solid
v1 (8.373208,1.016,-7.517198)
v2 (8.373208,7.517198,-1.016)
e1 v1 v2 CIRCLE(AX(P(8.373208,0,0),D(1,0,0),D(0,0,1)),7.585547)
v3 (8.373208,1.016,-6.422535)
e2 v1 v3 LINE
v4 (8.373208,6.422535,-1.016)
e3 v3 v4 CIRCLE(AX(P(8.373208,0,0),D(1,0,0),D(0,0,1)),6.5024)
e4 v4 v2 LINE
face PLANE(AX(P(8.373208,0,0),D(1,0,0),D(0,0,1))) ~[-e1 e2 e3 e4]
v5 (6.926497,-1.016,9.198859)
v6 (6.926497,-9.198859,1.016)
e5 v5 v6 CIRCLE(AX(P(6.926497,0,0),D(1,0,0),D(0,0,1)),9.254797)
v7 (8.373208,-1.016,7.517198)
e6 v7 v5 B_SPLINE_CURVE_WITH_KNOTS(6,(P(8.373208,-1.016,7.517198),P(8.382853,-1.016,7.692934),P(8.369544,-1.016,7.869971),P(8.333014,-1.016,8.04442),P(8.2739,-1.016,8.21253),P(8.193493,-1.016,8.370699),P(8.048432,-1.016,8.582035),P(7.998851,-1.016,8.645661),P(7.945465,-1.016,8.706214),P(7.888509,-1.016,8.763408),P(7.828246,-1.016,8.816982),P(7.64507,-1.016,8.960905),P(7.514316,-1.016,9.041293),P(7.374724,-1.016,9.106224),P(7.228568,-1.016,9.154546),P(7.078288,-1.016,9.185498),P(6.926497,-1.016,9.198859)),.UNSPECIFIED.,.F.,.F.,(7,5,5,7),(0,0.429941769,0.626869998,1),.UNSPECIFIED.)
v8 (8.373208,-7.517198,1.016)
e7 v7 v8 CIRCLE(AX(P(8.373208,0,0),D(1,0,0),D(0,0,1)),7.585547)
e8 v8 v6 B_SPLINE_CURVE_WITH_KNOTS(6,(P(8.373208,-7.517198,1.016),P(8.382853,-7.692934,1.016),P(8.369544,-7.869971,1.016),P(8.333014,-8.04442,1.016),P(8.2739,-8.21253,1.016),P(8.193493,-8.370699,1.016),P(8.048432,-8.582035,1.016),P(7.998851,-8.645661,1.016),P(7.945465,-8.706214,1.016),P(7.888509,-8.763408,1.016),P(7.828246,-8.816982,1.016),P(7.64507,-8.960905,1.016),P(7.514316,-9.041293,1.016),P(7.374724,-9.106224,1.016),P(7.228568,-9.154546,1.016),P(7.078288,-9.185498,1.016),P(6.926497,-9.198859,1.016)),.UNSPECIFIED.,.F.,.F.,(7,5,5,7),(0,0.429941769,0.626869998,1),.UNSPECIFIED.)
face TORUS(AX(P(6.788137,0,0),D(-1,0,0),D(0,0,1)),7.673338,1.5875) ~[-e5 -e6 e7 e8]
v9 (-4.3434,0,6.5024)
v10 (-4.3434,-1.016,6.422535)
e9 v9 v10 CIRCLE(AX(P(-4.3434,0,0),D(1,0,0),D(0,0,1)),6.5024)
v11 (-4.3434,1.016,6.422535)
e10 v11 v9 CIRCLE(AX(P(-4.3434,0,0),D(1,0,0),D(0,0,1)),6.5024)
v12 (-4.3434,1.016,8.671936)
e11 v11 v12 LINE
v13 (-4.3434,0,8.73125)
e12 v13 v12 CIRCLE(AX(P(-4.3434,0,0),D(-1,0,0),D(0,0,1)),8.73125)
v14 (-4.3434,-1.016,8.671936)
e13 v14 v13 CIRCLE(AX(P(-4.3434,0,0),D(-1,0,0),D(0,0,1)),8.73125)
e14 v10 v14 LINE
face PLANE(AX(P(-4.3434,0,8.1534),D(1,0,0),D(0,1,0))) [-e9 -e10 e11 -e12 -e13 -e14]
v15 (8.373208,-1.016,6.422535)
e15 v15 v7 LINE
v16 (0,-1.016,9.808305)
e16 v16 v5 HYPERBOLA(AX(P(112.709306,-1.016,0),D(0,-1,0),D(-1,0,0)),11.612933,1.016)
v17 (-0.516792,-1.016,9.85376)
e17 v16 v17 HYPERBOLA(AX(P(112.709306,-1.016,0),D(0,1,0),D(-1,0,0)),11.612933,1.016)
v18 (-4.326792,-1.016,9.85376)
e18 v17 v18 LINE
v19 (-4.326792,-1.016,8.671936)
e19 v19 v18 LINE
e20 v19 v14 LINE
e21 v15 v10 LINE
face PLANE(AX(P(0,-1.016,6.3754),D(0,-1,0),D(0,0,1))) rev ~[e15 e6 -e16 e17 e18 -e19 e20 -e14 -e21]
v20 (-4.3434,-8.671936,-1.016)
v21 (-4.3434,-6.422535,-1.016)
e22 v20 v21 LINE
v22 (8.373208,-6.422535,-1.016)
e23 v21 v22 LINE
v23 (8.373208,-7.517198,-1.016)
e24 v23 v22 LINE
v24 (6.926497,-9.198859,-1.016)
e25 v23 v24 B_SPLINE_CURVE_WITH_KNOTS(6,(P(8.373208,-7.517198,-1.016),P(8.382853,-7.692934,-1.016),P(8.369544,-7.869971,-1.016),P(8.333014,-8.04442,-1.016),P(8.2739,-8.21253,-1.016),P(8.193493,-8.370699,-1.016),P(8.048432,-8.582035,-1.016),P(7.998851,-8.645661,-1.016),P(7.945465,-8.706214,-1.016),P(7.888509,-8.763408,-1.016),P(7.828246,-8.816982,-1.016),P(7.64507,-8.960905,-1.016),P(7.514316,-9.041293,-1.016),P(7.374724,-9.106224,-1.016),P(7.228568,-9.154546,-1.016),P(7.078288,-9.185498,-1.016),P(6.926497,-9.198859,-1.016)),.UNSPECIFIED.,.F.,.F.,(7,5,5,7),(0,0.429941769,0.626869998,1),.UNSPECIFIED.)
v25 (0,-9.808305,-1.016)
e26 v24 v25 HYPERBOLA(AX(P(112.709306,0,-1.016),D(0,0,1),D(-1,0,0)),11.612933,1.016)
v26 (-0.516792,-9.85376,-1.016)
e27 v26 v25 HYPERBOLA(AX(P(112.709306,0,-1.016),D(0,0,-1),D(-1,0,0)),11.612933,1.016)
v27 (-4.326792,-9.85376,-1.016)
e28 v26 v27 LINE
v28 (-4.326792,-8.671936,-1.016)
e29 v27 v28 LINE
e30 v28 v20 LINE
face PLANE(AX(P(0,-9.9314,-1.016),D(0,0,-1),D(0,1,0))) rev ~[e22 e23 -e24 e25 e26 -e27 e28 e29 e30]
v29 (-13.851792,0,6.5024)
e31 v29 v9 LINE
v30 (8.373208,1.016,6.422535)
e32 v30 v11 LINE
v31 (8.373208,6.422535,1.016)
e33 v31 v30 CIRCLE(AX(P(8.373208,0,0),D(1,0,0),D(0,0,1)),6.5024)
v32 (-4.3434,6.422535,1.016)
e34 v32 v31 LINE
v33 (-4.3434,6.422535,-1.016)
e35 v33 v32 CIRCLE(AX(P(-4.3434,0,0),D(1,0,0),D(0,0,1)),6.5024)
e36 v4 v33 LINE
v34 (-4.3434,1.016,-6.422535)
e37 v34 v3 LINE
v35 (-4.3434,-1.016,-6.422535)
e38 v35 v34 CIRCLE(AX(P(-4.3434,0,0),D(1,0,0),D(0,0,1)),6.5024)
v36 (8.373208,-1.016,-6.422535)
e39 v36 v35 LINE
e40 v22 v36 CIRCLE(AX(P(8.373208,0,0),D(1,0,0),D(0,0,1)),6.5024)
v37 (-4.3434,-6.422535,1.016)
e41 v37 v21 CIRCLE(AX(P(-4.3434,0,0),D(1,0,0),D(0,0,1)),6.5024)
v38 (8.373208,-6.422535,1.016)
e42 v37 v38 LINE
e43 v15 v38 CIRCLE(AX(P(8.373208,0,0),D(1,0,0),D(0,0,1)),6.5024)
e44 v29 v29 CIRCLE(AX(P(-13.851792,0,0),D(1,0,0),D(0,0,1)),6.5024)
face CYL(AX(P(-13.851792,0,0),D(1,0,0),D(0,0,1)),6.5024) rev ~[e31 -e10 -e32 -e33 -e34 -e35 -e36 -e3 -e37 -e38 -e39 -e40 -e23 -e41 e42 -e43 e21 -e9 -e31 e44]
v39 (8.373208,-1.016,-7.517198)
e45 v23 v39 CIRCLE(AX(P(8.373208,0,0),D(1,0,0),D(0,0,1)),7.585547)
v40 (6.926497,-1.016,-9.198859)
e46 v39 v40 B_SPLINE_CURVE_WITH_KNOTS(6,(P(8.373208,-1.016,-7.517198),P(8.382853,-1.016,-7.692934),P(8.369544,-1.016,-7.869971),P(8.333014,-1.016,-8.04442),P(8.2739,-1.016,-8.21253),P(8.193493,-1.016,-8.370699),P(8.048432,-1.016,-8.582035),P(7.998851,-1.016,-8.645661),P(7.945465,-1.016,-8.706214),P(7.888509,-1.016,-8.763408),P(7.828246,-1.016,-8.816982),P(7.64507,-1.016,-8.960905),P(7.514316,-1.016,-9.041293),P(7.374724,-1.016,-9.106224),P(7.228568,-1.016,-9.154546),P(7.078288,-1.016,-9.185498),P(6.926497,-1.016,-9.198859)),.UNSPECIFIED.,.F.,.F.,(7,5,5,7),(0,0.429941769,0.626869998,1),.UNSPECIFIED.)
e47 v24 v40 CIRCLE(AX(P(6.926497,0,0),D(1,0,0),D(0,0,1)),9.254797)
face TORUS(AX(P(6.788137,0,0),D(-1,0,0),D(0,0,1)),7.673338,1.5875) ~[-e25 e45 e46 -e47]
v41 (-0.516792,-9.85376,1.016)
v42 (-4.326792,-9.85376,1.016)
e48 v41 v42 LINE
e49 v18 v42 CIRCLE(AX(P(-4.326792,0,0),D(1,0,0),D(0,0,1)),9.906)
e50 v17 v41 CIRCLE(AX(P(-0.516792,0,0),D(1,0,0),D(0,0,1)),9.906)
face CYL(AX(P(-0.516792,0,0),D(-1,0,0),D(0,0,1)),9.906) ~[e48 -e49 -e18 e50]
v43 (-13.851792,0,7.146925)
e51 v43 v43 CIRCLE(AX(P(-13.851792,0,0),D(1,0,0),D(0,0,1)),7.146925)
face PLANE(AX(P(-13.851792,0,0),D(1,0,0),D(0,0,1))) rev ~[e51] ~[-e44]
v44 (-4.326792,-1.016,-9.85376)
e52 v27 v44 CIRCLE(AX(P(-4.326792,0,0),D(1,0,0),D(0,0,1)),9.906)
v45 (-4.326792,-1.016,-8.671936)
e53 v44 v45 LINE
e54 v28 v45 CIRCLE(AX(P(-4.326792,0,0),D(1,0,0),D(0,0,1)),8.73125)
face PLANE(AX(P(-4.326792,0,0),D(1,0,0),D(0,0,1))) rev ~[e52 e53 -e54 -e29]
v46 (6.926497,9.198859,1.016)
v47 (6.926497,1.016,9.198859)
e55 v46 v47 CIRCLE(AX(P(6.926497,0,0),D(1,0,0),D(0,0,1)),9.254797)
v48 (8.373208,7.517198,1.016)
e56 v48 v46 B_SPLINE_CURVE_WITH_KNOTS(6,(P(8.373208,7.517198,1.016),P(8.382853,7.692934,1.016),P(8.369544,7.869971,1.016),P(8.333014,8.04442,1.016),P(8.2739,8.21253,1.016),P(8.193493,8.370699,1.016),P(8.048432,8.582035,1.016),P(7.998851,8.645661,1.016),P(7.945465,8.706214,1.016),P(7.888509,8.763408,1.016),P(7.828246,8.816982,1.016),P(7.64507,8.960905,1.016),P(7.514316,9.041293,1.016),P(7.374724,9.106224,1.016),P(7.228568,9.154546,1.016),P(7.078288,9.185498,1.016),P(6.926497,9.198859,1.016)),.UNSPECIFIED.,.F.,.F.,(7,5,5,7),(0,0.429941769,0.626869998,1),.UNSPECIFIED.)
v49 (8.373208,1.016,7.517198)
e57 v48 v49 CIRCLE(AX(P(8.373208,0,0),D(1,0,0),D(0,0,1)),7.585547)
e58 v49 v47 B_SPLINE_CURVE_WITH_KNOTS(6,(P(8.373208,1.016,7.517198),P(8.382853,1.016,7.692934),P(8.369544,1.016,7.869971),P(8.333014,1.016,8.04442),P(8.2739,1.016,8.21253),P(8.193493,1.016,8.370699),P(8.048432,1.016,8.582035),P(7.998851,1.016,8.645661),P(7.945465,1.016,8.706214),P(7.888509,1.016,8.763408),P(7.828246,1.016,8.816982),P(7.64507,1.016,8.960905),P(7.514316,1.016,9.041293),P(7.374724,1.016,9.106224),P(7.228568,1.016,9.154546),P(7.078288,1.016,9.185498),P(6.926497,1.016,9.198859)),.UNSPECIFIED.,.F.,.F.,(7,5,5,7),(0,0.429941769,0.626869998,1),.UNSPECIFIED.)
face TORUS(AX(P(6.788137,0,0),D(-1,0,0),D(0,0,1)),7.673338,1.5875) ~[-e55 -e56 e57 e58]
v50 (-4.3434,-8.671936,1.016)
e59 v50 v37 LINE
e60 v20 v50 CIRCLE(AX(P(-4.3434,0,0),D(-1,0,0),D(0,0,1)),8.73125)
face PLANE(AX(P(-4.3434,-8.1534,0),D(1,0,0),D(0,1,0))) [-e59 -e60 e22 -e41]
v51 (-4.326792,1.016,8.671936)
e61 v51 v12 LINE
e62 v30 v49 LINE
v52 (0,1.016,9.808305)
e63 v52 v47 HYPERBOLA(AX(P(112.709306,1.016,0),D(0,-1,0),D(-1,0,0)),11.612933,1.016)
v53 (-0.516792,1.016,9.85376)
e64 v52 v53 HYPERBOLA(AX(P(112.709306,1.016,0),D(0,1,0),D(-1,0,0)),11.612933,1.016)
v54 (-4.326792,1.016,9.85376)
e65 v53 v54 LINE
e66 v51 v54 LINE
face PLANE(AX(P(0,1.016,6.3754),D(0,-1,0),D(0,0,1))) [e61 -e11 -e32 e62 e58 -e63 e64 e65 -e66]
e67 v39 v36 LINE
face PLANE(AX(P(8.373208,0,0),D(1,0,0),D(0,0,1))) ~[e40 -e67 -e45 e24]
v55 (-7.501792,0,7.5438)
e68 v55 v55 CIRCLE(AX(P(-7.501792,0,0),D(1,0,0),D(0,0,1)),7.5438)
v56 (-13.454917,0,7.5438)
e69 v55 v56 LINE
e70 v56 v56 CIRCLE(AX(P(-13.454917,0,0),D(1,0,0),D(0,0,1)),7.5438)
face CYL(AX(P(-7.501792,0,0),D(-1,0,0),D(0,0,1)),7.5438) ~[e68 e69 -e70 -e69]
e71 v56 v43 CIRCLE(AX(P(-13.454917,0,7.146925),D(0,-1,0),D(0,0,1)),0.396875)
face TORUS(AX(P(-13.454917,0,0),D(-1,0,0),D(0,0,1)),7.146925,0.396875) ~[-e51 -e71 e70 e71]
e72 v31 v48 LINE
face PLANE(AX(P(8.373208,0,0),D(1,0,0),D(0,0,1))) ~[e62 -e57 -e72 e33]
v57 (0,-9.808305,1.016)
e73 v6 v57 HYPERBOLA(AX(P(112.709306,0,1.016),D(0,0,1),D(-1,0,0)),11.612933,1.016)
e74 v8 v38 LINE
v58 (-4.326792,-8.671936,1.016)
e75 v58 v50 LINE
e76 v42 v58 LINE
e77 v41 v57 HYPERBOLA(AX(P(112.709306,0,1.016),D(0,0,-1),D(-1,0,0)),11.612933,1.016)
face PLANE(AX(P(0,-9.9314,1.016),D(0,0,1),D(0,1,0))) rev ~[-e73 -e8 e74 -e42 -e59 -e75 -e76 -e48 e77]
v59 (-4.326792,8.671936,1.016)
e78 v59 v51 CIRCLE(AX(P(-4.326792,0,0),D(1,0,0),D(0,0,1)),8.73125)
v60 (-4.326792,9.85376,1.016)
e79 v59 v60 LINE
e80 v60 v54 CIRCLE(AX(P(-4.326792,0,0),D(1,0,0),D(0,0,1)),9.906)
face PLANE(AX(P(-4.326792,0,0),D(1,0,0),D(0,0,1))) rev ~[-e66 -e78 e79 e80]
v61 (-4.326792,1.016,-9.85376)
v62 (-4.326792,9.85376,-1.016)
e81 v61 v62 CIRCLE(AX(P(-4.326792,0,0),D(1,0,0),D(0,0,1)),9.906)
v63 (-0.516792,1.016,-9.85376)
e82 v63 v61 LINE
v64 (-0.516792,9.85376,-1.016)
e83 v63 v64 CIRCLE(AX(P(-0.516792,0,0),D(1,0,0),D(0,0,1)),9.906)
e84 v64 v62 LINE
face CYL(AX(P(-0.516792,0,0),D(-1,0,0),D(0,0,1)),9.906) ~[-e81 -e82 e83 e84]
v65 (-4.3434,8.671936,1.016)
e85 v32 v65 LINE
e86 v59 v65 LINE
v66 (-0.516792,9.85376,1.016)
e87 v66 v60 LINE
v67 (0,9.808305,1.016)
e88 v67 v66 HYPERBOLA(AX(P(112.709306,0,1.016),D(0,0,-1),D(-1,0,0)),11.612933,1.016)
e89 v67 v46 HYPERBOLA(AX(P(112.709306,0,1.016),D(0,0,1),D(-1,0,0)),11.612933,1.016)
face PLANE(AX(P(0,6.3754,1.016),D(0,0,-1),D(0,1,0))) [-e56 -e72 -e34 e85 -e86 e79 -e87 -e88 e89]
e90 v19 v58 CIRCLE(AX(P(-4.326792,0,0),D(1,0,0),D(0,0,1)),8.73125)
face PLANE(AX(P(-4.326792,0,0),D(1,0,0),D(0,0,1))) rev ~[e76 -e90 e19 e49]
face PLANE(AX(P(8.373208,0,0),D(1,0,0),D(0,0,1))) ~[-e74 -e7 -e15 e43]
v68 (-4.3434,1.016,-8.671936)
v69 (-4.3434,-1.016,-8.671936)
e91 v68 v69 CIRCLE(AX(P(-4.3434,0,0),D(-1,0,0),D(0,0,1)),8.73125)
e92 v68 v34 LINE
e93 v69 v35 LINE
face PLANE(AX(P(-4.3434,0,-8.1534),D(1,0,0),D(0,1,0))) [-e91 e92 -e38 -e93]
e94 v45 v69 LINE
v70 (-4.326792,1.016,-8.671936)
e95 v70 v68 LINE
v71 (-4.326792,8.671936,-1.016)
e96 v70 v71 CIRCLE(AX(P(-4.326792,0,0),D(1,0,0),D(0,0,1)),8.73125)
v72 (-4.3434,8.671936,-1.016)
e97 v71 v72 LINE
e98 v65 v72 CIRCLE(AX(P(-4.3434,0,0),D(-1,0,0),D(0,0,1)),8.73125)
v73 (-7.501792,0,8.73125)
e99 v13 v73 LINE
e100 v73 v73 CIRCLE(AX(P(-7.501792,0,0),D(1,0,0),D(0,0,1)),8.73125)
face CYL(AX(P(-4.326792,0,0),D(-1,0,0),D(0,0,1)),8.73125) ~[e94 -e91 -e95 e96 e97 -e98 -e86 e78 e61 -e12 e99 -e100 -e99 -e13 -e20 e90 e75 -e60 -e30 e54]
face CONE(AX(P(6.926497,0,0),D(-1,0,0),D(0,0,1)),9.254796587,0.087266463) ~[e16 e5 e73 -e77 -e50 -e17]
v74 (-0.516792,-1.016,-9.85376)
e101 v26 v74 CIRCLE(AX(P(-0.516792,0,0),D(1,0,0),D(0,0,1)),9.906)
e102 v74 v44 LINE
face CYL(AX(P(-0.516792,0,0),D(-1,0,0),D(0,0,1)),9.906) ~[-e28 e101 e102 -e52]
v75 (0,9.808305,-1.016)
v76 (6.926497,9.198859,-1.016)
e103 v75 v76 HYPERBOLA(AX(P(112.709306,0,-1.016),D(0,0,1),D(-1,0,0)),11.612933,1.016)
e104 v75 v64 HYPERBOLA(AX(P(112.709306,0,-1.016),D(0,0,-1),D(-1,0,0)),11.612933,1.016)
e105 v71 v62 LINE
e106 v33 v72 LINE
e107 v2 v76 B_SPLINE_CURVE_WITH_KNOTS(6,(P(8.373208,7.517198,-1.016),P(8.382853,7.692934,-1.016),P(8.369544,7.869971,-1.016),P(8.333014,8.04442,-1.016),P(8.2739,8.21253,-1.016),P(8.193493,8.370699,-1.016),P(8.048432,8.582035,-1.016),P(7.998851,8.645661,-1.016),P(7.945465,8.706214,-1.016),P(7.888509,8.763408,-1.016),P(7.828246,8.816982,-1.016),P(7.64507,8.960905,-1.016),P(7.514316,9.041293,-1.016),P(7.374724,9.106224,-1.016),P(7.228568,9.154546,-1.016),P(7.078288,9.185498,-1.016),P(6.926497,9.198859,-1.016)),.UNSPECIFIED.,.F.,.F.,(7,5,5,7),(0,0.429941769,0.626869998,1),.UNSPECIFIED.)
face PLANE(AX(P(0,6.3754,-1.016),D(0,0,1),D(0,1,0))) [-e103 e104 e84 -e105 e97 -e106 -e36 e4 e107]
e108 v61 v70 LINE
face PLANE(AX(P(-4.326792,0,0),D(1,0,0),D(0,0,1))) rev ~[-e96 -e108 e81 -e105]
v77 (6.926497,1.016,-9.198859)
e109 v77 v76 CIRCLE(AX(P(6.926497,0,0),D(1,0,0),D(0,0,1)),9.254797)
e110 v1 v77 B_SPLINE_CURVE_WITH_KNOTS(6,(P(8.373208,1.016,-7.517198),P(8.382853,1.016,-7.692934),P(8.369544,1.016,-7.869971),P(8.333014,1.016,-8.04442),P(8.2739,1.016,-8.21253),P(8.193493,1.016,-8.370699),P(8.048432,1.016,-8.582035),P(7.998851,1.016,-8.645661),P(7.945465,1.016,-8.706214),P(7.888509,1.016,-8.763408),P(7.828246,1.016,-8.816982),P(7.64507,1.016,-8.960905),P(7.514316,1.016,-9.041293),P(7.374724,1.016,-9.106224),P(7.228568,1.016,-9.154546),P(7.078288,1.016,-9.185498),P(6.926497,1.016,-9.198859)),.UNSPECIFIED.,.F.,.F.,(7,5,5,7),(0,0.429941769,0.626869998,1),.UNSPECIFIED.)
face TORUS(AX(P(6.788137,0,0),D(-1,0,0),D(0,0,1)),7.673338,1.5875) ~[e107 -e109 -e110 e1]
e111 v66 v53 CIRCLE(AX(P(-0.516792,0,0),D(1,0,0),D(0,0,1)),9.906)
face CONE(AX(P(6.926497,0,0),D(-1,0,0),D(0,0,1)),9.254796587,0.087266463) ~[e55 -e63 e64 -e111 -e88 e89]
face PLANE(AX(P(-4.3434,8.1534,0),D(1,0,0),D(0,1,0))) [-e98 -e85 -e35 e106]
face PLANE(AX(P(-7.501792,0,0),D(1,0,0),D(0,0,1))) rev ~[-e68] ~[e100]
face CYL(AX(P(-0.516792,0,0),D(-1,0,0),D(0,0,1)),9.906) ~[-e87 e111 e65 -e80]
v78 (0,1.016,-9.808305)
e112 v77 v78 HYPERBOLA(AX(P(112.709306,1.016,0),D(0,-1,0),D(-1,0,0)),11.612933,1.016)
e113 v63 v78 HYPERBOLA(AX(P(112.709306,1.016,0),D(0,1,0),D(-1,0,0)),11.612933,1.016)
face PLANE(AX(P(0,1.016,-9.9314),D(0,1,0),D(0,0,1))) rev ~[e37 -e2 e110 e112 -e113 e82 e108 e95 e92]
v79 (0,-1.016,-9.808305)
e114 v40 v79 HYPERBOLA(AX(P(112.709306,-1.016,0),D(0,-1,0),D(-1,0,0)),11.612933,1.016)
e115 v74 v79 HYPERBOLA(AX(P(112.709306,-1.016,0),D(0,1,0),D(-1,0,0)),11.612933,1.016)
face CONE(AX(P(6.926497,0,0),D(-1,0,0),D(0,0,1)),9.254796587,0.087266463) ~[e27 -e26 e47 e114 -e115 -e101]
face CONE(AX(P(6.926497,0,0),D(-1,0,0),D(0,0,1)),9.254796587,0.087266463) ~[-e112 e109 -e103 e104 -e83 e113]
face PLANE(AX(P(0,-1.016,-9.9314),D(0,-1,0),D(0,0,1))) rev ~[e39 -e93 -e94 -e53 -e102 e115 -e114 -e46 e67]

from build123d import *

# Parameters (mm, degrees)
F2_W          = 2.032
F2_H          = 3.556
F2_W_2        = 3.556
F2_H_2        = 2.032
F3_DEPTH      = 25.4
F3_DEPTH_BACK = 4.3434


# Not quite as in the source:
# - a feature names something its author has since deleted; it is built from what else it names


with BuildPart() as f1:
    # F0 (on Front) → F1 (revolve)
    with BuildSketch(Plane.XZ):
        with BuildLine():
            ThreePointArc((8.3732076521, 7.5855466623), (7.9877835669, 8.7130510839), (6.9264967271, 9.2547965866))
            Line((6.9264967271, 9.2547965866), (-0.5167923479, 9.906))
            Line((-0.5167923479, 9.906), (-4.3267923479, 9.906))
            Line((-4.3267923479, 9.906), (-4.3267923479, 8.73125))
            Line((-4.3267923479, 8.73125), (-7.5017923479, 8.73125))
            Line((-7.5017923479, 8.73125), (-7.5017923479, 7.5438))
            Line((-7.5017923479, 7.5438), (-13.4549173479, 7.5438))
            ThreePointArc((-13.4549173479, 7.5438), (-13.7355503517, 7.4275580038), (-13.8517923479, 7.146925))
            Line((-13.8517923479, 7.146925), (-13.8517923479, 6.5024))
            Line((-13.8517923479, 6.5024), (8.3732076521, 6.5024))
            Line((8.3732076521, 6.5024), (8.3732076521, 7.5855466623))
        make_face()
    revolve(axis=Axis((-0.2325048039, 0, 0), (1, 0, 0)))

    # F2 (on Right) → F3 (cut, two sides)
    with BuildSketch(Plane.YZ) as f3_sk:
        with Locations((0, -8.1534)):
            Rectangle(F2_W, F2_H)
        with Locations((0, 8.1534)):
            Rectangle(F2_W, F2_H)
        with Locations((-8.1534, 0)):
            Rectangle(F2_W_2, F2_H_2)
        with Locations((8.1534, 0)):
            Rectangle(F2_W_2, F2_H_2)
    extrude(amount=F3_DEPTH, mode=Mode.SUBTRACT)
    extrude(f3_sk.sketch, amount=-F3_DEPTH_BACK, mode=Mode.SUBTRACT)


solid = f1.part
